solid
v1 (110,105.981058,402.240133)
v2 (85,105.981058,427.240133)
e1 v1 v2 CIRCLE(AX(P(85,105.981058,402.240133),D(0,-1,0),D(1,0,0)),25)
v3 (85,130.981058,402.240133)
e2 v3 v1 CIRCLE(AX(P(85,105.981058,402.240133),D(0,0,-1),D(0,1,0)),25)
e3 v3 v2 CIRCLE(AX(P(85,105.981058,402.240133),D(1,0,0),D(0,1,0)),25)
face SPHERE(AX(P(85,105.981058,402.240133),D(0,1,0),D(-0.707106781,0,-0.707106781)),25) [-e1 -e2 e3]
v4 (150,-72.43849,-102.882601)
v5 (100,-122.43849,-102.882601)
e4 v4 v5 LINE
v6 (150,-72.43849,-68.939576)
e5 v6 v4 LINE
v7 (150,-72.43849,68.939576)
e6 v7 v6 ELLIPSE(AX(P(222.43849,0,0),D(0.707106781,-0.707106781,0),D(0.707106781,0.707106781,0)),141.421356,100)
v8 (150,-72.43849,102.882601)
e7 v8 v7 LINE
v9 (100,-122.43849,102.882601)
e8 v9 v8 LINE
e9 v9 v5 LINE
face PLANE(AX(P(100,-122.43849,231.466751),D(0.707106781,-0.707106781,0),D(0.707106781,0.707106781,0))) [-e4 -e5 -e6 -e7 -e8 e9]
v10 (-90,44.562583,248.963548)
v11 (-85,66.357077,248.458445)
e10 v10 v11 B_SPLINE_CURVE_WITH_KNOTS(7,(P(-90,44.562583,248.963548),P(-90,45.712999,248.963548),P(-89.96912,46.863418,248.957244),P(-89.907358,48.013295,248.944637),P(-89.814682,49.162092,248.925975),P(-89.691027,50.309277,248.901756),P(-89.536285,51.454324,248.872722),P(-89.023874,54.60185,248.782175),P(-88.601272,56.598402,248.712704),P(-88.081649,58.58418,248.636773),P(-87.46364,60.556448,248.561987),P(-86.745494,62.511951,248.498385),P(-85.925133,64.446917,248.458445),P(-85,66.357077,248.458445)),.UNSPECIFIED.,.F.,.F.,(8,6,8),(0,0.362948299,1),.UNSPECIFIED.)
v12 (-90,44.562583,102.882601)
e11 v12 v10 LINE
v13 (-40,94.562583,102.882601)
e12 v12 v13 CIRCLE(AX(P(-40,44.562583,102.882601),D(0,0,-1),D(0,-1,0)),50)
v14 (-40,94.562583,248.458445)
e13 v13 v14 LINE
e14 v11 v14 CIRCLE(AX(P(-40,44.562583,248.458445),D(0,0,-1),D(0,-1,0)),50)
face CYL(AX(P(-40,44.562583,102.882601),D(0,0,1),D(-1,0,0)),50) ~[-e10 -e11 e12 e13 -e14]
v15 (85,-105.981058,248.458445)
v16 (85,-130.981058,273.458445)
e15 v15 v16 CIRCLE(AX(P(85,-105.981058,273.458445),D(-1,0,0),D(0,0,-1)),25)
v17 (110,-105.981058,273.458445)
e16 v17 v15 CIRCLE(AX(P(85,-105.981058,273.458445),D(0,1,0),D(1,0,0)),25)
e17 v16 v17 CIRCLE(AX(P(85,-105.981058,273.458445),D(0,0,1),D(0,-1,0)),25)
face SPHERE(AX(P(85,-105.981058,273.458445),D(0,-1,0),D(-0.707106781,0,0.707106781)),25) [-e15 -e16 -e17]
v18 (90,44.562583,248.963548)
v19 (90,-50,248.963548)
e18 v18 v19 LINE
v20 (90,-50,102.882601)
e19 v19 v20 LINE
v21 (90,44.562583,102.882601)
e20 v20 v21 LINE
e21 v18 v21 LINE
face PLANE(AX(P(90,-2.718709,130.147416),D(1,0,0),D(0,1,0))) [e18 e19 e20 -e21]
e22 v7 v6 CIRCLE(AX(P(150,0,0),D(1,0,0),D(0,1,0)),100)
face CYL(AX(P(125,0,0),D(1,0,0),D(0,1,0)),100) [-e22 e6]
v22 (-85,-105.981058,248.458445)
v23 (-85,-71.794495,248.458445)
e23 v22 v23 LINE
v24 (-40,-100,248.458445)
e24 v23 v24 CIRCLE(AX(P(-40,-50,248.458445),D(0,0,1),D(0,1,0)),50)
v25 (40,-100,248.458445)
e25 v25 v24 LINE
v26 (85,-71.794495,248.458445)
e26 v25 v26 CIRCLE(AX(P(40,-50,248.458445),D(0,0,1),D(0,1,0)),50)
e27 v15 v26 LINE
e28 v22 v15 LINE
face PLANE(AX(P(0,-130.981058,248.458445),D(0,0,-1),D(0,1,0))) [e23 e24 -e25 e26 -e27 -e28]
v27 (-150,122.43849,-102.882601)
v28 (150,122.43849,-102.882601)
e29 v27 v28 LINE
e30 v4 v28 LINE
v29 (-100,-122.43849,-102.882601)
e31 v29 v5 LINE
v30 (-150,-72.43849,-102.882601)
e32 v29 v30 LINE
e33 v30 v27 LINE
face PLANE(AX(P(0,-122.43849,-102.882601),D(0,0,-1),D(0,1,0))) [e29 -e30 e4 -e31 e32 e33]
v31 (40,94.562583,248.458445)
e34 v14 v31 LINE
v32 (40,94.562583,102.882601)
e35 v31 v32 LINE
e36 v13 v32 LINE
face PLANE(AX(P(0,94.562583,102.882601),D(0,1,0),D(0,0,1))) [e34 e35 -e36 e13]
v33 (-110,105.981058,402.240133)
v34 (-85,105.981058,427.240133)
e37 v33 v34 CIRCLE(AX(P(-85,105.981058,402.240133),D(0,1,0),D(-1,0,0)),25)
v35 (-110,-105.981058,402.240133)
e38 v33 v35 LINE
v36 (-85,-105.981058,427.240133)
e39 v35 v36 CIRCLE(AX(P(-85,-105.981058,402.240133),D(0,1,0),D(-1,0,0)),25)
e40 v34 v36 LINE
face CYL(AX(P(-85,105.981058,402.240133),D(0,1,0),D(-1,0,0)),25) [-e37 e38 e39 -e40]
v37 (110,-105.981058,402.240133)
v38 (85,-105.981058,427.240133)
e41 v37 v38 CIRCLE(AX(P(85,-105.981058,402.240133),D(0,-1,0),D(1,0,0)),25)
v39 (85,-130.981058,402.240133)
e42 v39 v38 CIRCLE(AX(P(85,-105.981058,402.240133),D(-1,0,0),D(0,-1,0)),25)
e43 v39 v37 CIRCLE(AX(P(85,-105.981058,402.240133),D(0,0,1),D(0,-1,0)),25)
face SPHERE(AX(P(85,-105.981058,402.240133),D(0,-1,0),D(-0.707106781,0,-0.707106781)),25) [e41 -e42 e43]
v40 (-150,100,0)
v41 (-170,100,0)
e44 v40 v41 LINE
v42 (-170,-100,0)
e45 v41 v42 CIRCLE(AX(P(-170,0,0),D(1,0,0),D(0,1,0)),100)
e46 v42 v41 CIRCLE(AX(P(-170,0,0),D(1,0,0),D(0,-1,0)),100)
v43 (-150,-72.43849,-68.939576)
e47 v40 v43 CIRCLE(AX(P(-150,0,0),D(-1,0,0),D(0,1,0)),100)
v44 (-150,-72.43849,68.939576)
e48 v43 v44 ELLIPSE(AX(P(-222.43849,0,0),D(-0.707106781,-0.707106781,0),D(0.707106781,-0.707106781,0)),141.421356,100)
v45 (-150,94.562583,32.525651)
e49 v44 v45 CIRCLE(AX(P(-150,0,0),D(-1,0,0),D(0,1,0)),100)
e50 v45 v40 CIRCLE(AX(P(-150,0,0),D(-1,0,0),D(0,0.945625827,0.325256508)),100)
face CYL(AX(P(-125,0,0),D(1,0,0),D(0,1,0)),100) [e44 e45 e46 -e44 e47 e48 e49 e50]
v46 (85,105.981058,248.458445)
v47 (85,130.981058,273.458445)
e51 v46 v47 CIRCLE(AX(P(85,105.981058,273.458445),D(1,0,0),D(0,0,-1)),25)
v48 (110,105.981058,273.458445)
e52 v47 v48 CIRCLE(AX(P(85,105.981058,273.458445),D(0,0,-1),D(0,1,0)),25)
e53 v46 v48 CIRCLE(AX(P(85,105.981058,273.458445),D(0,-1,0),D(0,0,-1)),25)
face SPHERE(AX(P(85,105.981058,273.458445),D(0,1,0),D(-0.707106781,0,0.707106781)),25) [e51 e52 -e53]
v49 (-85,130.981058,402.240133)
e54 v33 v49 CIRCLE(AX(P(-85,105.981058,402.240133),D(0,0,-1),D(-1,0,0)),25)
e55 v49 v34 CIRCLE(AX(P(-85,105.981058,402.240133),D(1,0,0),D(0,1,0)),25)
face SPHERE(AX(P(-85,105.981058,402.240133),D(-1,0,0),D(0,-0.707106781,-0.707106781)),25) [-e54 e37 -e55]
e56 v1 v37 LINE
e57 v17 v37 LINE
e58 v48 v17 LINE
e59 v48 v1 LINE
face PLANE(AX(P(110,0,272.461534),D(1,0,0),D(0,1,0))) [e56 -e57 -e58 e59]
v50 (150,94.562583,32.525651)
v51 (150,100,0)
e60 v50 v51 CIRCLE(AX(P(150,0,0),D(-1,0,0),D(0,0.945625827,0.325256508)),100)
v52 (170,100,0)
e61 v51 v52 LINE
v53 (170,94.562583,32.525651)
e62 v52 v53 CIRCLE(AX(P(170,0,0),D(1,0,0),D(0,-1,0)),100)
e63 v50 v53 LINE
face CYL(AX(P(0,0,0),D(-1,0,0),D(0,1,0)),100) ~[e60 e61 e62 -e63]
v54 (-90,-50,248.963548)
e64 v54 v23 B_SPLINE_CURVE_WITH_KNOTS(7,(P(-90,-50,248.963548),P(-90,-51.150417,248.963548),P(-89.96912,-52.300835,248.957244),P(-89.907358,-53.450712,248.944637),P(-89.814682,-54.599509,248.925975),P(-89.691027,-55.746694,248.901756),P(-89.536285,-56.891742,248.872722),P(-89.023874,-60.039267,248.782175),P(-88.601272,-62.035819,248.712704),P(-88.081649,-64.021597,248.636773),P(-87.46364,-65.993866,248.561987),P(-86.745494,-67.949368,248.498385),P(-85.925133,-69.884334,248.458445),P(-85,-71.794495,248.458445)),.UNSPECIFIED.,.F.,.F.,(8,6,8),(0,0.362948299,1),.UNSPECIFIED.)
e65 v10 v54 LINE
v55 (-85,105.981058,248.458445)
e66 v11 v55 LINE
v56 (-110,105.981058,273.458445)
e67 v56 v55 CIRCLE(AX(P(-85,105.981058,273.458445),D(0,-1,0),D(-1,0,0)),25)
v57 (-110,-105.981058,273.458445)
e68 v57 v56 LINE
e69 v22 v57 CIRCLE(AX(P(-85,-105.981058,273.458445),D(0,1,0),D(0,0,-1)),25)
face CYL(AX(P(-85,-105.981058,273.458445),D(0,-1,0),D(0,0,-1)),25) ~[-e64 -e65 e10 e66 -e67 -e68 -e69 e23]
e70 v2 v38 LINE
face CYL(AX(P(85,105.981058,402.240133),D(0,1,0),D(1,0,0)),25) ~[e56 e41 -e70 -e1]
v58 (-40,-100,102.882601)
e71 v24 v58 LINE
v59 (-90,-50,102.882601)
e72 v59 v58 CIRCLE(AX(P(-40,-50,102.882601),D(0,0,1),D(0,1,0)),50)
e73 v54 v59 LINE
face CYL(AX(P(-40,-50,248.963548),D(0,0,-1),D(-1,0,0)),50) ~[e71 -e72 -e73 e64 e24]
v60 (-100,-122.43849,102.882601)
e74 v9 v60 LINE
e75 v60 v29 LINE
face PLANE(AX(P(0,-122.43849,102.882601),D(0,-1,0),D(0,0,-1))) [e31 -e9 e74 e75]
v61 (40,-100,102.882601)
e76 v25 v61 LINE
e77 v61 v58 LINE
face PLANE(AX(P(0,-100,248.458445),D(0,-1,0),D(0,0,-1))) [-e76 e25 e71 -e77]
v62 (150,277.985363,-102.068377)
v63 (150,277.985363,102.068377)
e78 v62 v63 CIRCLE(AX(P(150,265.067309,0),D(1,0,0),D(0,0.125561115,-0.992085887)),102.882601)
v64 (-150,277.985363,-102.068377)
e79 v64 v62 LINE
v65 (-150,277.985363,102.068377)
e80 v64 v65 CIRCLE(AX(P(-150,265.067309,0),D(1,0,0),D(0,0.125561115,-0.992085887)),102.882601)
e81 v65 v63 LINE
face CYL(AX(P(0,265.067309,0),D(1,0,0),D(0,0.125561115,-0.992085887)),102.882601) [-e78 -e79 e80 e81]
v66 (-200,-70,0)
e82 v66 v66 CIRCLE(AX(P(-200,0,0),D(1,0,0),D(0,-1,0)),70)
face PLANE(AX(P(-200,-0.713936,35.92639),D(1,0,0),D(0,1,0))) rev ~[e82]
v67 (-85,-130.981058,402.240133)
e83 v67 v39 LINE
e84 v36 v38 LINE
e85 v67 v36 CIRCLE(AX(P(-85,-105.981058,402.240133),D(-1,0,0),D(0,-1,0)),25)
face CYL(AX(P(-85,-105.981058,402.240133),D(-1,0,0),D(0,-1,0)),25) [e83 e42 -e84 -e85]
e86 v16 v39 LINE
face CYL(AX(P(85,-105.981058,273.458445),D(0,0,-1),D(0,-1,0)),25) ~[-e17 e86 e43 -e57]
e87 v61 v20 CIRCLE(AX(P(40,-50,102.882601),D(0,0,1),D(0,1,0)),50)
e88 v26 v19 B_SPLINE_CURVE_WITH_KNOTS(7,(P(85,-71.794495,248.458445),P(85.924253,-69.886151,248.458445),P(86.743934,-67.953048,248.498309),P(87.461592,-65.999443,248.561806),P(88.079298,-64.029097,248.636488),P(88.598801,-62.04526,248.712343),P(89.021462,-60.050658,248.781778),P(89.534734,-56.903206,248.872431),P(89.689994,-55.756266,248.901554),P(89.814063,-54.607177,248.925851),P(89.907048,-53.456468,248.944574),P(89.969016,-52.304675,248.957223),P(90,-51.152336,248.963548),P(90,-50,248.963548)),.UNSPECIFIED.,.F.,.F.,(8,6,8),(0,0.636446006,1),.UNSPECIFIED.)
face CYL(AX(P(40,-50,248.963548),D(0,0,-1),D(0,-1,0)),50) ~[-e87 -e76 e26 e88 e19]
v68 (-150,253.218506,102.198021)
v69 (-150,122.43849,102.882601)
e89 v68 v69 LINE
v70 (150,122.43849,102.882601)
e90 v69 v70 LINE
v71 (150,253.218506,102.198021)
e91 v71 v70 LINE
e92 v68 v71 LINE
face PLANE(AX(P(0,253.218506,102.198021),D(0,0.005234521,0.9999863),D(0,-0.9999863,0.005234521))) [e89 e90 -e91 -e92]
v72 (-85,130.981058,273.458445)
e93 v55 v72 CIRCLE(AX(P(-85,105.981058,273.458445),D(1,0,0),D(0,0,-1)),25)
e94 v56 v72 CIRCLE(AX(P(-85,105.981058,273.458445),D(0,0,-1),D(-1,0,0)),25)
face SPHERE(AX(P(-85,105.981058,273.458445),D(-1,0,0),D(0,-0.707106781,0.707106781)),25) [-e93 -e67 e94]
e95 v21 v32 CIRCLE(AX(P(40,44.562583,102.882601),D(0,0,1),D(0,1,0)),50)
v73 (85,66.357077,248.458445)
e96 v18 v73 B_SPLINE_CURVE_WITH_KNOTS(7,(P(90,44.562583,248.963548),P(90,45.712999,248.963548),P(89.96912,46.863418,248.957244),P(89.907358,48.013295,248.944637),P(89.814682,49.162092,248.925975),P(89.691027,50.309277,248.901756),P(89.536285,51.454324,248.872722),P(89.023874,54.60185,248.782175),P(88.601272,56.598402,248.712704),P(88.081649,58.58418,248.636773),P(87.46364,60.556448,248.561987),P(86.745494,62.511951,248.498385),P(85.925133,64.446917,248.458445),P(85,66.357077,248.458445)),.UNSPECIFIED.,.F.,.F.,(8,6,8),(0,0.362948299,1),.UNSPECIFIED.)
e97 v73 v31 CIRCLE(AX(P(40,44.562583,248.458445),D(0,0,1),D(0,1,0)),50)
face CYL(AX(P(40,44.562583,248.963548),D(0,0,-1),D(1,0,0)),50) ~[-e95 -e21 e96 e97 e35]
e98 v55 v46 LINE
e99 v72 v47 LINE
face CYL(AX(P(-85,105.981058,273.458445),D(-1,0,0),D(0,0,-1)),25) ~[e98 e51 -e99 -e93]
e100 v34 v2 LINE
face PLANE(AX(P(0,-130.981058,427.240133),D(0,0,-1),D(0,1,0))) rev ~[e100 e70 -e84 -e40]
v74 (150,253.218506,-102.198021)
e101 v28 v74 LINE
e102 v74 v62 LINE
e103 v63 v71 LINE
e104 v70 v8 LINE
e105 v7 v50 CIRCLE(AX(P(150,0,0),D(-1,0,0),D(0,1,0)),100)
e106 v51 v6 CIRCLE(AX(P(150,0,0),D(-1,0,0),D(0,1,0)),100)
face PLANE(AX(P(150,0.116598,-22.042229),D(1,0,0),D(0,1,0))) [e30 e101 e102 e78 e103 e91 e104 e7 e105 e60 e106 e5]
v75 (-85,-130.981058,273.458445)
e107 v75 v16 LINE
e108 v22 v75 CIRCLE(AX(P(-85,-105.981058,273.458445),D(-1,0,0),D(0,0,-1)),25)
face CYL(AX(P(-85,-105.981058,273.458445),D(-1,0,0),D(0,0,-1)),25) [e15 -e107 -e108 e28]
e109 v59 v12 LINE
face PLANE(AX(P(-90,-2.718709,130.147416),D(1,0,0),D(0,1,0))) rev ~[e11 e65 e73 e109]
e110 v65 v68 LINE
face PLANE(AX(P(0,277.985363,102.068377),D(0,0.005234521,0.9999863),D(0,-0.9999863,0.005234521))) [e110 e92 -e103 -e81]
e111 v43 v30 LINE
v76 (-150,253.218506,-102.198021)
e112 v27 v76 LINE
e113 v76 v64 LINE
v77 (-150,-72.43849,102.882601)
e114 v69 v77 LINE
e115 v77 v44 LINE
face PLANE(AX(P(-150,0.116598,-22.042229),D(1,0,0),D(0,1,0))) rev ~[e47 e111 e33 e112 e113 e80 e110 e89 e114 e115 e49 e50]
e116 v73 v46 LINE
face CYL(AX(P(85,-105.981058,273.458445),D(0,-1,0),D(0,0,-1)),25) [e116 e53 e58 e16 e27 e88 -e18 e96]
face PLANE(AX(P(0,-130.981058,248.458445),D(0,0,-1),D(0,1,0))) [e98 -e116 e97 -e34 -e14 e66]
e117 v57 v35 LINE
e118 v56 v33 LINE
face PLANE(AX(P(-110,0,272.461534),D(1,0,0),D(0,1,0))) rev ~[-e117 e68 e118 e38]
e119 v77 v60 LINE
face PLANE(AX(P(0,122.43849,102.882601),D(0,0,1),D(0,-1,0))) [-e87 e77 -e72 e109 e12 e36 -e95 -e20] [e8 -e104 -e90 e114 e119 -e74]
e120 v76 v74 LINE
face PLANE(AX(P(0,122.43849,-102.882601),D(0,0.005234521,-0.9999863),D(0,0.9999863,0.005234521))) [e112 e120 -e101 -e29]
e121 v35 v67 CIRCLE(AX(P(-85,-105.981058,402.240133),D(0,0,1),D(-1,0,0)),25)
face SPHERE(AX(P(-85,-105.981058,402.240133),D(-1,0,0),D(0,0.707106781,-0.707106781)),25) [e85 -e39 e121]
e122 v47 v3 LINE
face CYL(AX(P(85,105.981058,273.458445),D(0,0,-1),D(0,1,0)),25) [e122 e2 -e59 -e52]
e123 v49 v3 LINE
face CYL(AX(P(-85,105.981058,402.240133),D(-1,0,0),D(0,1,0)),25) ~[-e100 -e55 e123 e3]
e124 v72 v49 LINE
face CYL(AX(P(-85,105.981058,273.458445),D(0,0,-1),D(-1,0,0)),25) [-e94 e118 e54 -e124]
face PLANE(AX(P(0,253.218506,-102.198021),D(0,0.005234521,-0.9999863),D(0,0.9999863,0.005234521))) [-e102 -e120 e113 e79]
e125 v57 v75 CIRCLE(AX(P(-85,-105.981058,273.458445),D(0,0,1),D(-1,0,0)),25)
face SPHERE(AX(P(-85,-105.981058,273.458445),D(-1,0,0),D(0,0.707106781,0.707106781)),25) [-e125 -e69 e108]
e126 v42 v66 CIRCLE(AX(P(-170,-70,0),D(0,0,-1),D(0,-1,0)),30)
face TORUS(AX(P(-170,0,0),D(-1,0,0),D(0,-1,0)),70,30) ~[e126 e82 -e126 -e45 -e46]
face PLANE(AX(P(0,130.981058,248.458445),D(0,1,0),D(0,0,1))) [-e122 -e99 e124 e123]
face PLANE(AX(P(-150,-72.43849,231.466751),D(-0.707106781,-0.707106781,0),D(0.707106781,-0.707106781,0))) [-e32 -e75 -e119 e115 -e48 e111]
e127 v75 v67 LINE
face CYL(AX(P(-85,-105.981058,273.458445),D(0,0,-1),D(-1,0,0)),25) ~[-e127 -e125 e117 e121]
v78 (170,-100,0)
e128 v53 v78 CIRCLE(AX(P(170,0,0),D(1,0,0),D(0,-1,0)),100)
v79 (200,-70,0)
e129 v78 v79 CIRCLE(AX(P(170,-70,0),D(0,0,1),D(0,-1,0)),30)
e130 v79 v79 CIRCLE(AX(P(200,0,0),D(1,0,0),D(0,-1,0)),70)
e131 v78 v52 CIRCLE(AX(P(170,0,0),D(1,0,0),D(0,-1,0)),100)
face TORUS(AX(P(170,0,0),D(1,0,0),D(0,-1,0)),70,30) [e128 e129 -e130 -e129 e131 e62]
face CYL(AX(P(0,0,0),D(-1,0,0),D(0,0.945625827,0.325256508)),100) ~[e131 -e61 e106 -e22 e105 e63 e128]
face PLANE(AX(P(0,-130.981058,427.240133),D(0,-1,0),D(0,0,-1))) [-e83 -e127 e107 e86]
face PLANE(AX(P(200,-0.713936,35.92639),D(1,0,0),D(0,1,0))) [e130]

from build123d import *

# Parameters (mm, degrees)
F0_W          = 194.5625826716
F0_H          = 54.5296296477
F1_DEPTH      = 90
F0_W_2        = 261.9621157646
F0_H_2        = 41.3846671581
F0_H_3        = 48.0061769485
F2_DEPTH      = 110
F3_DEPTH      = 150
F4_DEPTH      = 200
F5_T1_DEPTH   = 170
F5_T3_DEPTH   = 211.9621157646
F5_T5_DEPTH   = 128.7816882133
F5_S9_W       = 25
F5_S9_H       = 25
F5_T10_DEPTH  = 25
F5_S15_W      = 25
F5_S15_H      = 25
F5_T16_DEPTH  = 25
F5_S21_W      = 25
F5_S21_H      = 25
F5_T22_DEPTH  = 25
F5_S27_W      = 25
F5_S27_H      = 25
F5_T28_DEPTH  = 25
F5_S33_W      = 25
F5_S33_H      = 25
F5_T34_DEPTH  = 25
F5_S39_W      = 25
F5_S39_H      = 25
F5_T40_DEPTH  = 25
F5_S45_W      = 25
F5_S45_H      = 25
F5_T46_DEPTH  = 25
F5_S51_W      = 25
F5_S51_H      = 25
F5_T52_DEPTH  = 25
F5_T58_DEPTH  = 211.9621157646
F5_T64_DEPTH  = 211.9621157646
F5_T70_DEPTH  = 211.9621157646
F5_T77_DEPTH  = 211.9621157646
F5_T83_DEPTH  = 211.9621157646
F5_T89_DEPTH  = 211.9621157646
F5_T95_DEPTH  = 211.9621157646
F5_T101_DEPTH = 211.9621157646
F5_T108_DEPTH = 211.9621157646
F5_T114_DEPTH = 211.9621157646
F6_R          = 50
F8_T4_DEPTH   = 462.9335014381
F8_S5_R       = 100
F8_T6_DEPTH   = 236
F8_T10_DEPTH  = 462.9335014381
F8_S11_R      = 100
F8_T12_DEPTH  = 236


# Not quite as in the source:
# - a fillet or chamfer that OpenCascade refuses, or shapes differently, is made with other operations: its cross-section is extruded or revolved along the edge and cut away or added


with BuildPart() as f1:
    # F0 (on Right) → F1 (new body, symmetric)
    with BuildSketch(Plane.YZ):
        with Locations((-2.7187086642, 130.1474161446)):
            Rectangle(F0_W, F0_H)
        Polygon((-100, 210.3845775127), (-100, 157.4122309685), (94.5625826716, 157.4122309685), (94.5625826716, 209.366121575), align=None)
        Polygon((-100, 248.4584450722), (-100, 210.3845775127), (94.5625826716, 209.366121575), (94.5625826716, 248.4584450722), align=None)
    extrude(amount=F1_DEPTH, both=True)

    # F0 (on Right) → F2 (join, symmetric)
    with BuildSketch(Plane.YZ):
        Polygon((-130.9810578823, 248.4584450722), (-100, 248.4584450722), (94.5625826716, 248.4584450722), (130.9810578823, 248.4584450722), (130.9810578823, 296.4646220207), (-130.9810578823, 296.4646220207), align=None)
        with Locations((0, 317.1569555998)):
            Rectangle(F0_W_2, F0_H_2)
        with Locations((0, 361.8523776531)):
            Rectangle(F0_W_2, F0_H_3)
        with Locations((0, 406.5477997065)):
            Rectangle(F0_W_2, F0_H_2)
    extrude(amount=F2_DEPTH, both=True)

    # F0 (on Right) → F3 (join, symmetric)
    with BuildSketch(Plane.YZ):
        with BuildLine():
            ThreePointArc((100, 0), (0, -100), (-100, 0))
            Line((-100, 0), (-100, 102.8826013207))
            Line((-100, 102.8826013207), (-122.4384903908, 102.8826013207))
            Line((-122.4384903908, 102.8826013207), (-122.4384903908, -102.8826013207))
            Line((-122.4384903908, -102.8826013207), (122.4384903908, -102.8826013207))
            Line((122.4384903908, -102.8826013207), (122.4384903908, 102.8826013207))
            Line((122.4384903908, 102.8826013207), (94.5625826716, 102.8826013207))
            Line((94.5625826716, 102.8826013207), (94.5625826716, 32.525650777))
            ThreePointArc((94.5625826716, 32.525650777), (98.6312786776, 16.4885071009), (100, 0))
        make_face()
        with BuildLine():
            Line((253.218506448, 102.1980211612), (122.4384903908, 102.8826013207))
            Line((122.4384903908, 102.8826013207), (122.4384903908, -102.8826013207))
            Line((122.4384903908, -102.8826013207), (253.218506448, -102.1980211612))
            ThreePointArc((253.218506448, -102.1980211612), (162.1847078204, 0), (253.218506448, 102.1980211612))
        make_face()
        with BuildLine():
            Line((277.9853632955, 102.0683767451), (253.218506448, 102.1980211612))
            ThreePointArc((253.218506448, 102.1980211612), (162.1847078204, 0), (253.218506448, -102.1980211612))
            Line((253.218506448, -102.1980211612), (277.9853632955, -102.0683767451))
            Line((277.9853632955, -102.0683767451), (277.9853632955, 102.0683767451))
        make_face()
        with BuildLine():
            ThreePointArc((367.9499104619, 0), (342.2485007293, 68.0286213263), (277.9853632955, 102.0683767451))
            Line((277.9853632955, 102.0683767451), (277.9853632955, -102.0683767451))
            ThreePointArc((277.9853632955, -102.0683767451), (342.2485007293, -68.0286213263), (367.9499104619, 0))
        make_face()
        with BuildLine():
            Line((-100, 102.8826013207), (-100, 0))
            ThreePointArc((-100, 0), (-16.4885071009, 98.6312786776), (94.5625826716, 32.525650777))
            Line((94.5625826716, 32.525650777), (94.5625826716, 102.8826013207))
            Line((94.5625826716, 102.8826013207), (-100, 102.8826013207))
        make_face()
    extrude(amount=F3_DEPTH, both=True)

    # F0 (on Right) → F4 (join, symmetric)
    with BuildSketch(Plane.YZ):
        with BuildLine():
            ThreePointArc((94.5625826716, 32.525650777), (-16.4885071009, 98.6312786776), (-100, 0))
            Line((-100, 0), (94.5625826716, 0))
            Line((94.5625826716, 0), (94.5625826716, 32.525650777))
        make_face()
        with BuildLine():
            Line((94.5625826716, 0), (-100, 0))
            ThreePointArc((-100, 0), (0, -100), (100, 0))
            ThreePointArc((100, 0), (98.6312786776, 16.4885071009), (94.5625826716, 32.525650777))
            Line((94.5625826716, 32.525650777), (94.5625826716, 0))
        make_face()
    extrude(amount=F4_DEPTH, both=True)

    # F5: fillet of radius 25 on 12 edges, made by hand

    # F5_s2 → F5_t1 (cut)
    with BuildSketch(Plane.YZ.offset(-85)):
        with BuildLine():
            ThreePointArc((-130.9810578823, 402.2401332855), (-123.658727412, 419.9178028152), (-105.9810578823, 427.2401332855))
            Line((-105.9810578823, 427.2401332855), (-130.9810578823, 427.2401332855))
            Line((-130.9810578823, 427.2401332855), (-130.9810578823, 402.2401332855))
        make_face()
        with BuildLine():
            ThreePointArc((130.9810578823, 402.2401332855), (123.658727412, 419.9178028152), (105.9810578823, 427.2401332855))
            Line((105.9810578823, 427.2401332855), (130.9810578823, 427.2401332855))
            Line((130.9810578823, 427.2401332855), (130.9810578823, 402.2401332855))
        make_face()
        with BuildLine():
            ThreePointArc((-105.9810578823, 248.4584450722), (-123.658727412, 255.7807755425), (-130.9810578823, 273.4584450722))
            Line((-130.9810578823, 273.4584450722), (-130.9810578823, 248.4584450722))
            Line((-130.9810578823, 248.4584450722), (-105.9810578823, 248.4584450722))
        make_face()
        with BuildLine():
            ThreePointArc((105.9810578823, 248.4584450722), (123.658727412, 255.7807755425), (130.9810578823, 273.4584450722))
            Line((130.9810578823, 273.4584450722), (130.9810578823, 248.4584450722))
            Line((130.9810578823, 248.4584450722), (105.9810578823, 248.4584450722))
        make_face()
    extrude(amount=F5_T1_DEPTH, mode=Mode.SUBTRACT)

    # F5_s4 → F5_t3 (cut)
    with BuildSketch(Plane.XZ.offset(-105.9810578823)):
        with BuildLine():
            ThreePointArc((110, 402.2401332855), (102.6776695297, 419.9178028152), (85, 427.2401332855))
            Line((85, 427.2401332855), (110, 427.2401332855))
            Line((110, 427.2401332855), (110, 402.2401332855))
        make_face()
        with BuildLine():
            ThreePointArc((-110, 402.2401332855), (-102.6776695297, 419.9178028152), (-85, 427.2401332855))
            Line((-85, 427.2401332855), (-110, 427.2401332855))
            Line((-110, 427.2401332855), (-110, 402.2401332855))
        make_face()
    extrude(amount=F5_T3_DEPTH, mode=Mode.SUBTRACT)

    # F5_s6 → F5_t5 (cut)
    with BuildSketch(Plane.XY.offset(273.4584450722)):
        with BuildLine():
            ThreePointArc((85, -130.9810578823), (102.6776695297, -123.658727412), (110, -105.9810578823))
            Line((110, -105.9810578823), (110, -130.9810578823))
            Line((110, -130.9810578823), (85, -130.9810578823))
        make_face()
        with BuildLine():
            ThreePointArc((85, 130.9810578823), (102.6776695297, 123.658727412), (110, 105.9810578823))
            Line((110, 105.9810578823), (110, 130.9810578823))
            Line((110, 130.9810578823), (85, 130.9810578823))
        make_face()
        with BuildLine():
            ThreePointArc((-110, -105.9810578823), (-102.6776695297, -123.658727412), (-85, -130.9810578823))
            Line((-85, -130.9810578823), (-110, -130.9810578823))
            Line((-110, -130.9810578823), (-110, -105.9810578823))
        make_face()
        with BuildLine():
            ThreePointArc((-110, 105.9810578823), (-102.6776695297, 123.658727412), (-85, 130.9810578823))
            Line((-85, 130.9810578823), (-110, 130.9810578823))
            Line((-110, 130.9810578823), (-110, 105.9810578823))
        make_face()
    extrude(amount=F5_T5_DEPTH, mode=Mode.SUBTRACT)


with BuildPart() as f5_tool8:
    # F5_s9 → F5_t10 (new body)
    with BuildSketch(Plane.XZ.offset(105.9810578823)):
        with Locations((97.5, 414.7401332855)):
            Rectangle(F5_S9_W, F5_S9_H)
    extrude(amount=F5_T10_DEPTH)

    # F5_s11 → F5_t12 (revolve, cut)
    with BuildSketch(Plane(origin=(85, -105.9810578823, 402.2401332855), x_dir=(-0.7071067812, 0, -0.7071067812), z_dir=(-0.7071067812, 0, 0.7071067812))):
        with BuildLine():
            ThreePointArc((0, -25), (25, 0), (0, 25))
            Line((0, 25), (0, -25))
        make_face()
    revolve(axis=Axis((85, -105.9810578823, 402.2401332855), (0, -1, 0)), mode=Mode.SUBTRACT)


with BuildPart() as f1_1:
    add(f1.part)

    # F5_t7: cut F5_tool8
    add(f5_tool8.part, mode=Mode.SUBTRACT)


with BuildPart() as f5_tool14:
    # F5_s15 → F5_t16 (new body)
    with BuildSketch(Plane.YZ.offset(-85)):
        with Locations((-118.4810578823, 414.7401332855)):
            Rectangle(F5_S15_W, F5_S15_H)
    extrude(amount=-F5_T16_DEPTH)

    # F5_s17 → F5_t18 (revolve, cut)
    with BuildSketch(Plane(origin=(-85, -105.9810578823, 402.2401332855), x_dir=(0, 0.7071067812, -0.7071067812), z_dir=(0, 0.7071067812, 0.7071067812))):
        with BuildLine():
            ThreePointArc((0, -25), (25, 0), (0, 25))
            Line((0, 25), (0, -25))
        make_face()
    revolve(axis=Axis((-85, -105.9810578823, 402.2401332855), (-1, 0, 0)), mode=Mode.SUBTRACT)


with BuildPart() as f1_2:
    add(f1_1.part)

    # F5_t13: cut F5_tool14
    add(f5_tool14.part, mode=Mode.SUBTRACT)


with BuildPart() as f5_tool20:
    # F5_s21 → F5_t22 (new body)
    with BuildSketch(Plane.XZ.offset(-105.9810578823)):
        with Locations((97.5, 414.7401332855)):
            Rectangle(F5_S21_W, F5_S21_H)
    extrude(amount=-F5_T22_DEPTH)

    # F5_s23 → F5_t24 (revolve, cut)
    with BuildSketch(Plane(origin=(85, 105.9810578823, 402.2401332855), x_dir=(-0.7071067812, 0, -0.7071067812), z_dir=(0.7071067812, 0, -0.7071067812))):
        with BuildLine():
            ThreePointArc((0, -25), (25, 0), (0, 25))
            Line((0, 25), (0, -25))
        make_face()
    revolve(axis=Axis((85, 105.9810578823, 402.2401332855), (0, 1, 0)), mode=Mode.SUBTRACT)


with BuildPart() as f1_3:
    add(f1_2.part)

    # F5_t19: cut F5_tool20
    add(f5_tool20.part, mode=Mode.SUBTRACT)


with BuildPart() as f5_tool26:
    # F5_s27 → F5_t28 (new body)
    with BuildSketch(Plane.YZ.offset(-85)):
        with Locations((118.4810578823, 414.7401332855)):
            Rectangle(F5_S27_W, F5_S27_H)
    extrude(amount=-F5_T28_DEPTH)

    # F5_s29 → F5_t30 (revolve, cut)
    with BuildSketch(Plane(origin=(-85, 105.9810578823, 402.2401332855), x_dir=(0, -0.7071067812, -0.7071067812), z_dir=(0, 0.7071067812, -0.7071067812))):
        with BuildLine():
            ThreePointArc((0, -25), (25, 0), (0, 25))
            Line((0, 25), (0, -25))
        make_face()
    revolve(axis=Axis((-85, 105.9810578823, 402.2401332855), (-1, 0, 0)), mode=Mode.SUBTRACT)


with BuildPart() as f1_4:
    add(f1_3.part)

    # F5_t25: cut F5_tool26
    add(f5_tool26.part, mode=Mode.SUBTRACT)


with BuildPart() as f5_tool32:
    # F5_s33 → F5_t34 (new body)
    with BuildSketch(Plane.XZ.offset(105.9810578823)):
        with Locations((97.5, 260.9584450722)):
            Rectangle(F5_S33_W, F5_S33_H)
    extrude(amount=F5_T34_DEPTH)

    # F5_s35 → F5_t36 (revolve, cut)
    with BuildSketch(Plane(origin=(85, -105.9810578823, 273.4584450722), x_dir=(-0.7071067812, 0, 0.7071067812), z_dir=(0.7071067812, 0, 0.7071067812))):
        with BuildLine():
            ThreePointArc((0, -25), (25, 0), (0, 25))
            Line((0, 25), (0, -25))
        make_face()
    revolve(axis=Axis((85, -105.9810578823, 273.4584450722), (0, -1, 0)), mode=Mode.SUBTRACT)


with BuildPart() as f1_5:
    add(f1_4.part)

    # F5_t31: cut F5_tool32
    add(f5_tool32.part, mode=Mode.SUBTRACT)


with BuildPart() as f5_tool38:
    # F5_s39 → F5_t40 (new body)
    with BuildSketch(Plane.XZ.offset(-105.9810578823)):
        with Locations((97.5, 260.9584450722)):
            Rectangle(F5_S39_W, F5_S39_H)
    extrude(amount=-F5_T40_DEPTH)

    # F5_s41 → F5_t42 (revolve, cut)
    with BuildSketch(Plane(origin=(85, 105.9810578823, 273.4584450722), x_dir=(-0.7071067812, 0, 0.7071067812), z_dir=(-0.7071067812, 0, -0.7071067812))):
        with BuildLine():
            ThreePointArc((0, -25), (25, 0), (0, 25))
            Line((0, 25), (0, -25))
        make_face()
    revolve(axis=Axis((85, 105.9810578823, 273.4584450722), (0, 1, 0)), mode=Mode.SUBTRACT)


with BuildPart() as f1_6:
    add(f1_5.part)

    # F5_t37: cut F5_tool38
    add(f5_tool38.part, mode=Mode.SUBTRACT)


with BuildPart() as f5_tool44:
    # F5_s45 → F5_t46 (new body)
    with BuildSketch(Plane.YZ.offset(-85)):
        with Locations((-118.4810578823, 260.9584450722)):
            Rectangle(F5_S45_W, F5_S45_H)
    extrude(amount=-F5_T46_DEPTH)

    # F5_s47 → F5_t48 (revolve, cut)
    with BuildSketch(Plane(origin=(-85, -105.9810578823, 273.4584450722), x_dir=(0, 0.7071067812, 0.7071067812), z_dir=(0, -0.7071067812, 0.7071067812))):
        with BuildLine():
            ThreePointArc((0, -25), (25, 0), (0, 25))
            Line((0, 25), (0, -25))
        make_face()
    revolve(axis=Axis((-85, -105.9810578823, 273.4584450722), (-1, 0, 0)), mode=Mode.SUBTRACT)


with BuildPart() as f1_7:
    add(f1_6.part)

    # F5_t43: cut F5_tool44
    add(f5_tool44.part, mode=Mode.SUBTRACT)


with BuildPart() as f5_tool50:
    # F5_s51 → F5_t52 (new body)
    with BuildSketch(Plane.YZ.offset(-85)):
        with Locations((118.4810578823, 260.9584450722)):
            Rectangle(F5_S51_W, F5_S51_H)
    extrude(amount=-F5_T52_DEPTH)

    # F5_s53 → F5_t54 (revolve, cut)
    with BuildSketch(Plane(origin=(-85, 105.9810578823, 273.4584450722), x_dir=(0, -0.7071067812, 0.7071067812), z_dir=(0, -0.7071067812, -0.7071067812))):
        with BuildLine():
            ThreePointArc((0, -25), (25, 0), (0, 25))
            Line((0, 25), (0, -25))
        make_face()
    revolve(axis=Axis((-85, 105.9810578823, 273.4584450722), (-1, 0, 0)), mode=Mode.SUBTRACT)


with BuildPart() as f1_8:
    add(f1_7.part)

    # F5_t49: cut F5_tool50
    add(f5_tool50.part, mode=Mode.SUBTRACT)


with BuildPart() as f5_tool56:
    # F5_s57 → F5_t58 (new body)
    with BuildSketch(Plane.XZ.offset(105.9810578823)):
        with BuildLine():
            ThreePointArc((85, 248.4584450722), (102.6776695297, 255.7807755425), (110, 273.4584450722))
            Line((110, 273.4584450722), (110, 248.4584450722))
            Line((110, 248.4584450722), (85, 248.4584450722))
        make_face()
    extrude(amount=-F5_T58_DEPTH)

    split(bisect_by=Plane.YZ.offset(90), keep=Keep.BOTTOM)

    split(bisect_by=Plane.XZ.offset(100), keep=Keep.TOP)


with BuildPart() as f1_9:
    add(f1_8.part)

    # F5_t55: cut F5_tool56
    add(f5_tool56.part, mode=Mode.SUBTRACT)


with BuildPart() as f5_tool62:
    # F5_s63 → F5_t64 (new body)
    with BuildSketch(Plane.XZ.offset(105.9810578823)):
        with BuildLine():
            ThreePointArc((85, 248.4584450722), (102.6776695297, 255.7807755425), (110, 273.4584450722))
            Line((110, 273.4584450722), (110, 248.4584450722))
            Line((110, 248.4584450722), (85, 248.4584450722))
        make_face()
    extrude(amount=-F5_T64_DEPTH)

    split(bisect_by=Plane.YZ.offset(90), keep=Keep.TOP)

    split(bisect_by=Plane.XZ.offset(100), keep=Keep.TOP)


with BuildPart() as f1_10:
    add(f1_9.part)

    # F5_t61: cut F5_tool62
    add(f5_tool62.part, mode=Mode.SUBTRACT)


with BuildPart() as f5_tool68:
    # F5_s69 → F5_t70 (new body)
    with BuildSketch(Plane.XZ.offset(105.9810578823)):
        with BuildLine():
            ThreePointArc((85, 248.4584450722), (102.6776695297, 255.7807755425), (110, 273.4584450722))
            Line((110, 273.4584450722), (110, 248.4584450722))
            Line((110, 248.4584450722), (85, 248.4584450722))
        make_face()
    extrude(amount=-F5_T70_DEPTH)

    split(bisect_by=Plane.YZ.offset(90), keep=Keep.TOP)

    split(bisect_by=Plane.XZ.offset(-94.5625826716), keep=Keep.TOP)

    split(bisect_by=Plane.XZ.offset(100), keep=Keep.BOTTOM)


with BuildPart() as f1_11:
    add(f1_10.part)

    # F5_t67: cut F5_tool68
    add(f5_tool68.part, mode=Mode.SUBTRACT)


with BuildPart() as f5_tool75:
    # F5_s76 → F5_t77 (new body)
    with BuildSketch(Plane.XZ.offset(105.9810578823)):
        with BuildLine():
            ThreePointArc((85, 248.4584450722), (102.6776695297, 255.7807755425), (110, 273.4584450722))
            Line((110, 273.4584450722), (110, 248.4584450722))
            Line((110, 248.4584450722), (85, 248.4584450722))
        make_face()
    extrude(amount=-F5_T77_DEPTH)

    split(bisect_by=Plane.YZ.offset(90), keep=Keep.BOTTOM)

    split(bisect_by=Plane.XZ.offset(-94.5625826716), keep=Keep.BOTTOM)


with BuildPart() as f1_12:
    add(f1_11.part)

    # F5_t74: cut F5_tool75
    add(f5_tool75.part, mode=Mode.SUBTRACT)


with BuildPart() as f5_tool81:
    # F5_s82 → F5_t83 (new body)
    with BuildSketch(Plane.XZ.offset(105.9810578823)):
        with BuildLine():
            ThreePointArc((85, 248.4584450722), (102.6776695297, 255.7807755425), (110, 273.4584450722))
            Line((110, 273.4584450722), (110, 248.4584450722))
            Line((110, 248.4584450722), (85, 248.4584450722))
        make_face()
    extrude(amount=-F5_T83_DEPTH)

    split(bisect_by=Plane.YZ.offset(90), keep=Keep.TOP)

    split(bisect_by=Plane.XZ.offset(-94.5625826716), keep=Keep.BOTTOM)


with BuildPart() as f1_13:
    add(f1_12.part)

    # F5_t80: cut F5_tool81
    add(f5_tool81.part, mode=Mode.SUBTRACT)


with BuildPart() as f5_tool87:
    # F5_s88 → F5_t89 (new body)
    with BuildSketch(Plane.XZ.offset(105.9810578823)):
        with BuildLine():
            ThreePointArc((-85, 248.4584450722), (-102.6776695297, 255.7807755425), (-110, 273.4584450722))
            Line((-110, 273.4584450722), (-110, 248.4584450722))
            Line((-110, 248.4584450722), (-85, 248.4584450722))
        make_face()
    extrude(amount=-F5_T89_DEPTH)

    split(bisect_by=Plane.YZ.offset(-90), keep=Keep.TOP)

    split(bisect_by=Plane.XZ.offset(100), keep=Keep.TOP)


with BuildPart() as f1_14:
    add(f1_13.part)

    # F5_t86: cut F5_tool87
    add(f5_tool87.part, mode=Mode.SUBTRACT)


with BuildPart() as f5_tool93:
    # F5_s94 → F5_t95 (new body)
    with BuildSketch(Plane.XZ.offset(105.9810578823)):
        with BuildLine():
            ThreePointArc((-85, 248.4584450722), (-102.6776695297, 255.7807755425), (-110, 273.4584450722))
            Line((-110, 273.4584450722), (-110, 248.4584450722))
            Line((-110, 248.4584450722), (-85, 248.4584450722))
        make_face()
    extrude(amount=-F5_T95_DEPTH)

    split(bisect_by=Plane.YZ.offset(-90), keep=Keep.BOTTOM)

    split(bisect_by=Plane.XZ.offset(100), keep=Keep.TOP)


with BuildPart() as f1_15:
    add(f1_14.part)

    # F5_t92: cut F5_tool93
    add(f5_tool93.part, mode=Mode.SUBTRACT)


with BuildPart() as f5_tool99:
    # F5_s100 → F5_t101 (new body)
    with BuildSketch(Plane.XZ.offset(105.9810578823)):
        with BuildLine():
            ThreePointArc((-85, 248.4584450722), (-102.6776695297, 255.7807755425), (-110, 273.4584450722))
            Line((-110, 273.4584450722), (-110, 248.4584450722))
            Line((-110, 248.4584450722), (-85, 248.4584450722))
        make_face()
    extrude(amount=-F5_T101_DEPTH)

    split(bisect_by=Plane.XZ.offset(-94.5625826716), keep=Keep.TOP)

    split(bisect_by=Plane.YZ.offset(-90), keep=Keep.BOTTOM)

    split(bisect_by=Plane.XZ.offset(100), keep=Keep.BOTTOM)


with BuildPart() as f1_16:
    add(f1_15.part)

    # F5_t98: cut F5_tool99
    add(f5_tool99.part, mode=Mode.SUBTRACT)


with BuildPart() as f5_tool106:
    # F5_s107 → F5_t108 (new body)
    with BuildSketch(Plane.XZ.offset(105.9810578823)):
        with BuildLine():
            ThreePointArc((-85, 248.4584450722), (-102.6776695297, 255.7807755425), (-110, 273.4584450722))
            Line((-110, 273.4584450722), (-110, 248.4584450722))
            Line((-110, 248.4584450722), (-85, 248.4584450722))
        make_face()
    extrude(amount=-F5_T108_DEPTH)

    split(bisect_by=Plane.XZ.offset(-94.5625826716), keep=Keep.BOTTOM)

    split(bisect_by=Plane.YZ.offset(-90), keep=Keep.TOP)


with BuildPart() as f1_17:
    add(f1_16.part)

    # F5_t105: cut F5_tool106
    add(f5_tool106.part, mode=Mode.SUBTRACT)


with BuildPart() as f5_tool112:
    # F5_s113 → F5_t114 (new body)
    with BuildSketch(Plane.XZ.offset(105.9810578823)):
        with BuildLine():
            ThreePointArc((-85, 248.4584450722), (-102.6776695297, 255.7807755425), (-110, 273.4584450722))
            Line((-110, 273.4584450722), (-110, 248.4584450722))
            Line((-110, 248.4584450722), (-85, 248.4584450722))
        make_face()
    extrude(amount=-F5_T114_DEPTH)

    split(bisect_by=Plane.XZ.offset(-94.5625826716), keep=Keep.BOTTOM)

    split(bisect_by=Plane.YZ.offset(-90), keep=Keep.BOTTOM)


with BuildPart() as f1_18:
    add(f1_17.part)

    # F5_t111: cut F5_tool112
    add(f5_tool112.part, mode=Mode.SUBTRACT)

    # F6
    f6_edges = [f1_18.edges().sort_by_distance(p)[0] for p in [
        (90, -100, 175.923074),
        (90, 94.562583, 175.923074),
        (-90, 94.562583, 175.923074),
        (-90, -100, 175.923074),
    ]]
    fillet(f6_edges, radius=F6_R)

    # F7: fillet of radius 30 on 2 edges, made by hand

    # F7_s1 → F7_t2 (revolve, cut)
    with BuildSketch(Plane.XY):
        with BuildLine():
            ThreePointArc((170, -100), (191.2132034356, -91.2132034356), (200, -70))
            Line((200, -70), (200, -100))
            Line((200, -100), (170, -100))
        make_face()
    revolve(axis=Axis((200, 0, 0), (1, 0, 0)), mode=Mode.SUBTRACT)

    # F7_s3 → F7_t4 (revolve, cut)
    with BuildSketch(Plane.XY):
        with BuildLine():
            ThreePointArc((-170, -100), (-191.2132034356, -91.2132034356), (-200, -70))
            Line((-200, -70), (-200, -100))
            Line((-200, -100), (-170, -100))
        make_face()
    revolve(axis=Axis((-200, 0, 0), (1, 0, 0)), mode=Mode.SUBTRACT)

    # F8: chamfer of 50 on 2 edges, made by hand


with BuildPart() as f8_tool2:
    # F8_s3 → F8_t4 (new body)
    with BuildSketch(Plane.XY.offset(231.466750719)):
        Polygon((-150, -72.4384903908), (-100, -122.4384903908), (-150, -122.4384903908), align=None)
    extrude(amount=-F8_T4_DEPTH)

    # F8_s5 → F8_t6 (cut, symmetric)
    with BuildSketch(Plane.YZ.offset(-125)):
        Circle(F8_S5_R)
    extrude(amount=F8_T6_DEPTH, both=True, mode=Mode.SUBTRACT)


with BuildPart() as f1_19:
    add(f1_18.part)

    # F8_t1: cut F8_tool2
    add(f8_tool2.part, mode=Mode.SUBTRACT)


with BuildPart() as f8_tool8:
    # F8_s9 → F8_t10 (new body)
    with BuildSketch(Plane.XY.offset(231.466750719)):
        Polygon((100, -122.4384903908), (150, -72.4384903908), (150, -122.4384903908), align=None)
    extrude(amount=-F8_T10_DEPTH)

    # F8_s11 → F8_t12 (cut, symmetric)
    with BuildSketch(Plane.YZ.offset(125)):
        Circle(F8_S11_R)
    extrude(amount=F8_T12_DEPTH, both=True, mode=Mode.SUBTRACT)


with BuildPart() as f1_20:
    add(f1_19.part)

    # F8_t7: cut F8_tool8
    add(f8_tool8.part, mode=Mode.SUBTRACT)


solid = f1_20.part
